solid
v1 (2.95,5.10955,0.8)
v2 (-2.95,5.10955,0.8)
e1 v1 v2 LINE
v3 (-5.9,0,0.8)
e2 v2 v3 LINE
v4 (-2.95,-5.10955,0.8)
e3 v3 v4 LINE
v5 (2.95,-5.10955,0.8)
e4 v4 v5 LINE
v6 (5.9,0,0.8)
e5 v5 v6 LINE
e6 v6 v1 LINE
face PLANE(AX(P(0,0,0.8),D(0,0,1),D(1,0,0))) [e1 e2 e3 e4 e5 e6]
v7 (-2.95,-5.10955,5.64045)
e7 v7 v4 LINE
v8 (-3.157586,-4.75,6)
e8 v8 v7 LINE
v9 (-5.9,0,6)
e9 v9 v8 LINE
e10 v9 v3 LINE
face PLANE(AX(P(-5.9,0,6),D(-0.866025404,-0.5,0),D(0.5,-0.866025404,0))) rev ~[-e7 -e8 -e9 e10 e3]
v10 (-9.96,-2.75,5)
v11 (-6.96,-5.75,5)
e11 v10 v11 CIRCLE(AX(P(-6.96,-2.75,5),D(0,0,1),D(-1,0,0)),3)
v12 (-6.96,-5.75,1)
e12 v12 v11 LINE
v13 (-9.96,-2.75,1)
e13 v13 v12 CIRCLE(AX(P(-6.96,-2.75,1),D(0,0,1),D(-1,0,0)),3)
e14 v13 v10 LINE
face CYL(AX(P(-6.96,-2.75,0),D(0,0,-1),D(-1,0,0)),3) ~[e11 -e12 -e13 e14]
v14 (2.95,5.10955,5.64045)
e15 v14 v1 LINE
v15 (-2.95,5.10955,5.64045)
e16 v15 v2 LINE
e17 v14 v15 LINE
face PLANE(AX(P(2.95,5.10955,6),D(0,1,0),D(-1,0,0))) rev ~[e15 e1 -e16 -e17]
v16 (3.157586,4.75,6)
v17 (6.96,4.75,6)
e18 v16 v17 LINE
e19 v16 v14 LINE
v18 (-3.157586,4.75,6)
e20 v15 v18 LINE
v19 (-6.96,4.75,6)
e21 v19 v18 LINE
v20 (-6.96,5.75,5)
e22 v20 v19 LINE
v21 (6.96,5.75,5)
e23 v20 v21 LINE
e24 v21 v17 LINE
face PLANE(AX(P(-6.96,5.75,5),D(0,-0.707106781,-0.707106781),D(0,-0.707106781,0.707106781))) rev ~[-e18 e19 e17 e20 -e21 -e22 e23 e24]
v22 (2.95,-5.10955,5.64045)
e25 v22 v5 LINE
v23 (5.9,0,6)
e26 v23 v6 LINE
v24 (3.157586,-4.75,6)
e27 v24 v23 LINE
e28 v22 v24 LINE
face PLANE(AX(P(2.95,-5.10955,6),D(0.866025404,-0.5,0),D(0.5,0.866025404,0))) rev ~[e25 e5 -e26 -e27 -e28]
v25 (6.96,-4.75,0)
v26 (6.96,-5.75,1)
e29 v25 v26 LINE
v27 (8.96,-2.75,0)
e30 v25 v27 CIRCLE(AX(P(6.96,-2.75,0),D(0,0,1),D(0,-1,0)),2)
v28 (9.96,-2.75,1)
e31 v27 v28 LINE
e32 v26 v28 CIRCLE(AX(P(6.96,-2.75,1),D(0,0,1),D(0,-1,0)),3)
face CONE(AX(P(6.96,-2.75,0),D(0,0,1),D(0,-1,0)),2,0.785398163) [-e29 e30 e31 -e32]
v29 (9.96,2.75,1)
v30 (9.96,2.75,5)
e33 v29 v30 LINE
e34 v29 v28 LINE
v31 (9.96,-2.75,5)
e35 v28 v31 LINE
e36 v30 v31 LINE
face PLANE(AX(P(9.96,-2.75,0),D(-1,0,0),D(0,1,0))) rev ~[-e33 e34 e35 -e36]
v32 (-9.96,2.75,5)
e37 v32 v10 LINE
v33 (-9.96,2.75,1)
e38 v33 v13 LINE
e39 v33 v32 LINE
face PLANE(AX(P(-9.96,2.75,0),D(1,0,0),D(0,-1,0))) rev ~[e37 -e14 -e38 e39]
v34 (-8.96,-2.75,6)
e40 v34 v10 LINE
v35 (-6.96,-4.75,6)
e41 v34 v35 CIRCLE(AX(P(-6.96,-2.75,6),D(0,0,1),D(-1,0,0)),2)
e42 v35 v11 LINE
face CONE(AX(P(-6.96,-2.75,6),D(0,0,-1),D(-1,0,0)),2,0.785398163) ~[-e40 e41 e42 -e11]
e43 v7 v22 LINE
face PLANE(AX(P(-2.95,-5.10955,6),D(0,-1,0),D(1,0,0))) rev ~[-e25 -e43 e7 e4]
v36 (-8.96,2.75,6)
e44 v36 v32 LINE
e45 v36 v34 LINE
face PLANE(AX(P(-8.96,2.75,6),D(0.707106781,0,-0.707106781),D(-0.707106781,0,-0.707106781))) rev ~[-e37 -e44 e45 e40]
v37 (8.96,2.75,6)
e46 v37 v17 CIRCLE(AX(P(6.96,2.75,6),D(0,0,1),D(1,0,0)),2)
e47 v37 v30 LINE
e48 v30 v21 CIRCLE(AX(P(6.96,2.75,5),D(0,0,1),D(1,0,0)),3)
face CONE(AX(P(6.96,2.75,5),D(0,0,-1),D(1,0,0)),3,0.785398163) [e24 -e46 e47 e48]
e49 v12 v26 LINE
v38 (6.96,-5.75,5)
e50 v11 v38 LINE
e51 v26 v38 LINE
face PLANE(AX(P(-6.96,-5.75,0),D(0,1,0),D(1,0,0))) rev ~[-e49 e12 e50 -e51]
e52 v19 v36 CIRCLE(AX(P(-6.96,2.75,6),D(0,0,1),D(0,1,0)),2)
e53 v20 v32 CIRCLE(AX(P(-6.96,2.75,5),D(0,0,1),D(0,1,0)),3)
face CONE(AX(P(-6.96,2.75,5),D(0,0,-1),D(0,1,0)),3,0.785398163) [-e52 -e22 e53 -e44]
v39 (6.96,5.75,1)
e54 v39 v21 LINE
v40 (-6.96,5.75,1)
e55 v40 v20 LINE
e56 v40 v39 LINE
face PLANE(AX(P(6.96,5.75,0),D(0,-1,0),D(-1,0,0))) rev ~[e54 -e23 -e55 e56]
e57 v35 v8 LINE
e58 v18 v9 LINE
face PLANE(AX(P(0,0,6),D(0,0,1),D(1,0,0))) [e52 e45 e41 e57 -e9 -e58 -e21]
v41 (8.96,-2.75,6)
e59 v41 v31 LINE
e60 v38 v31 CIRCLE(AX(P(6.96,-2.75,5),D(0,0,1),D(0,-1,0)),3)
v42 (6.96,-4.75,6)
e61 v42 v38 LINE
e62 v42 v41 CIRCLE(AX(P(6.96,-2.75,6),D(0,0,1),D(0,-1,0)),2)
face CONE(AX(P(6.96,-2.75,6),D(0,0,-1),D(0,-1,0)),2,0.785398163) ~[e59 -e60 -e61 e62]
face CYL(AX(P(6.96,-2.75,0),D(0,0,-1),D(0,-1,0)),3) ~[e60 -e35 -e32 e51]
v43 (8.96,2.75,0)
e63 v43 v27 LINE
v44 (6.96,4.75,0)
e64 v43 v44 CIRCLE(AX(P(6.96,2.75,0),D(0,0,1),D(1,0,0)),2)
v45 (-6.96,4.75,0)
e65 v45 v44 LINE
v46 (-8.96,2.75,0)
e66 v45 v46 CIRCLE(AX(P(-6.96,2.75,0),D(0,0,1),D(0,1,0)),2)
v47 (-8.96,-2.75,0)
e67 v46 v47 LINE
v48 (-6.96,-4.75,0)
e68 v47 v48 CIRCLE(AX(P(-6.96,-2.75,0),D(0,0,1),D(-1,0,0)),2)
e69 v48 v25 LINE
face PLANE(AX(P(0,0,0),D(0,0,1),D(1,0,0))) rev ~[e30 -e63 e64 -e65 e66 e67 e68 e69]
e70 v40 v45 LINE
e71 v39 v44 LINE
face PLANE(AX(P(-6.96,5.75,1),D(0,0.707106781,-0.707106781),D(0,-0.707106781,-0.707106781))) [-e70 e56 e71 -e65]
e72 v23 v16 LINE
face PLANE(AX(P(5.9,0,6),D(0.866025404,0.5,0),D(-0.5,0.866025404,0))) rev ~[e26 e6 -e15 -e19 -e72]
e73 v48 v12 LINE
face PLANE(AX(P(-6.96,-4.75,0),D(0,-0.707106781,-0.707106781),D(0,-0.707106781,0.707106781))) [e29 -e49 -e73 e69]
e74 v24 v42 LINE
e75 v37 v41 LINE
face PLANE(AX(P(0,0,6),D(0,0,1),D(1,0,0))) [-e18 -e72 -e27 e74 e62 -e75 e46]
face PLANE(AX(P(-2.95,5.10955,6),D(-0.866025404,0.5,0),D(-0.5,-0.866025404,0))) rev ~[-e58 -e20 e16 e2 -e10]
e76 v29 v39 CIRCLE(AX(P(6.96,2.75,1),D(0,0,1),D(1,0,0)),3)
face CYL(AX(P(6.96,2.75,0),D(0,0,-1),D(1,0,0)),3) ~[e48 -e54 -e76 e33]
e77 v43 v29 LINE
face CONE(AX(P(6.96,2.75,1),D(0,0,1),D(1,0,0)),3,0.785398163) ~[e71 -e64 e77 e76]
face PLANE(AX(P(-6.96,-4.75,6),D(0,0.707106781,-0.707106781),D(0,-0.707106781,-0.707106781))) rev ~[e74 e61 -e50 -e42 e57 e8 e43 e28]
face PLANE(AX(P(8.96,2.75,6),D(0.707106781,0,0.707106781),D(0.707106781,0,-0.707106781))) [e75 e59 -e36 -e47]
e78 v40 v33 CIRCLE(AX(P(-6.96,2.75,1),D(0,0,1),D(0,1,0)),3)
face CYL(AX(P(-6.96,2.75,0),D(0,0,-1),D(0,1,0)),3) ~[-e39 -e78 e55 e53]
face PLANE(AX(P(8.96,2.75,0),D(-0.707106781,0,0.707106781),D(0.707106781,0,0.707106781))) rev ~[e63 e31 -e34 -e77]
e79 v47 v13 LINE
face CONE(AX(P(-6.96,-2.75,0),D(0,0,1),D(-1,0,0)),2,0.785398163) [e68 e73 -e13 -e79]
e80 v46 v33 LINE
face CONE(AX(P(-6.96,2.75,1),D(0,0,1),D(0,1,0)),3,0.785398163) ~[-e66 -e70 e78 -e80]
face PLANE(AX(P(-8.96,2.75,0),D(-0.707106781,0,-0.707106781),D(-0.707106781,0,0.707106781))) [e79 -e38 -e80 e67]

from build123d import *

# Parameters (mm, degrees)
F1_DEPTH     = 6
F3_DEPTH     = 5.2
F4_T1_DEPTH  = 13.92
F4_T3_DEPTH  = 5.5
F4_T6_ANGLE  = 90
F4_T8_ANGLE  = 90
F4_T10_ANGLE = 90
F4_T12_ANGLE = 90
F4_T14_ANGLE = 90
F4_T16_ANGLE = 90
F4_T18_ANGLE = 90
F4_T20_ANGLE = 90


# Not quite as in the source:
# - a fillet or chamfer that OpenCascade refuses, or shapes differently, is made with other operations: its cross-section is extruded or revolved along the edge and cut away or added


with BuildPart() as f1:
    # F0 (on Top) → F1 (new body)
    with BuildSketch(Plane.XY):
        with BuildLine():
            Line((6.96, 5.75), (-6.96, 5.75))
            ThreePointArc((-6.96, 5.75), (-9.0813203436, 4.8713203436), (-9.96, 2.75))
            Line((-9.96, 2.75), (-9.96, -2.75))
            ThreePointArc((-9.96, -2.75), (-9.0813203436, -4.8713203436), (-6.96, -5.75))
            Line((-6.96, -5.75), (6.96, -5.75))
            ThreePointArc((6.96, -5.75), (9.0813203436, -4.8713203436), (9.96, -2.75))
            Line((9.96, -2.75), (9.96, 2.75))
            ThreePointArc((9.96, 2.75), (9.0813203436, 4.8713203436), (6.96, 5.75))
        make_face()
    extrude(amount=F1_DEPTH)

    # F2 (on face) → F3 (cut)
    with BuildSketch(Plane.XY.offset(6)):
        Polygon((2.95, 5.1095498823), (-2.95, 5.1095498823), (-5.9, 0), (-2.95, -5.1095498823), (2.95, -5.1095498823), (5.9, 0), align=None)
    extrude(amount=-F3_DEPTH, mode=Mode.SUBTRACT)

    # F4: chamfer of 1 on 2 edges, made by hand

    # F4_s2 → F4_t1 (cut)
    with BuildSketch(Plane.YZ.offset(-6.96)):
        Polygon((5.75, 5), (4.75, 6), (5.75, 6), align=None)
        Polygon((5.75, 1), (4.75, 0), (5.75, 0), align=None)
        Polygon((-4.75, 0), (-5.75, 1), (-5.75, 0), align=None)
        Polygon((-4.75, 6), (-5.75, 5), (-5.75, 6), align=None)
    extrude(amount=F4_T1_DEPTH, mode=Mode.SUBTRACT)

    # F4_s4 → F4_t3 (cut)
    with BuildSketch(Plane.XZ.offset(-2.75)):
        Polygon((-8.96, 0), (-9.96, 1), (-9.96, 0), align=None)
        Polygon((8.96, 0), (9.96, 1), (9.96, 0), align=None)
        Polygon((-8.96, 6), (-9.96, 5), (-9.96, 6), align=None)
        Polygon((8.96, 6), (9.96, 5), (9.96, 6), align=None)
    extrude(amount=F4_T3_DEPTH, mode=Mode.SUBTRACT)

    # F4_s5 → F4_t6 (revolve, cut)
    with BuildSketch(Plane.XZ.offset(-2.75)):
        Polygon((9.96, 1), (8.96, 0), (9.96, 0), align=None)
    revolve(axis=Axis((6.96, 2.75, 0), (0, 0, 1)), revolution_arc=F4_T6_ANGLE, mode=Mode.SUBTRACT)

    # F4_s7 → F4_t8 (revolve, cut)
    with BuildSketch(Plane.YZ.offset(-6.96)):
        Polygon((5.75, 1), (4.75, 0), (5.75, 0), align=None)
    revolve(axis=Axis((-6.96, 2.75, 0), (0, 0, 1)), revolution_arc=F4_T8_ANGLE, mode=Mode.SUBTRACT)

    # F4_s9 → F4_t10 (revolve, cut)
    with BuildSketch(Plane.XZ.offset(2.75)):
        Polygon((-8.96, 0), (-9.96, 1), (-9.96, 0), align=None)
    revolve(axis=Axis((-6.96, -2.75, 0), (0, 0, 1)), revolution_arc=F4_T10_ANGLE, mode=Mode.SUBTRACT)

    # F4_s11 → F4_t12 (revolve, cut)
    with BuildSketch(Plane.YZ.offset(6.96)):
        Polygon((-4.75, 0), (-5.75, 1), (-5.75, 0), align=None)
    revolve(axis=Axis((6.96, -2.75, 0), (0, 0, 1)), revolution_arc=F4_T12_ANGLE, mode=Mode.SUBTRACT)

    # F4_s13 → F4_t14 (revolve, cut)
    with BuildSketch(Plane.XZ.offset(-2.75)):
        Polygon((9.96, 5), (8.96, 6), (9.96, 6), align=None)
    revolve(axis=Axis((6.96, 2.75, 6), (0, 0, 1)), revolution_arc=F4_T14_ANGLE, mode=Mode.SUBTRACT)

    # F4_s15 → F4_t16 (revolve, cut)
    with BuildSketch(Plane.YZ.offset(-6.96)):
        Polygon((5.75, 5), (4.75, 6), (5.75, 6), align=None)
    revolve(axis=Axis((-6.96, 2.75, 6), (0, 0, 1)), revolution_arc=F4_T16_ANGLE, mode=Mode.SUBTRACT)

    # F4_s17 → F4_t18 (revolve, cut)
    with BuildSketch(Plane.XZ.offset(2.75)):
        Polygon((-8.96, 6), (-9.96, 5), (-9.96, 6), align=None)
    revolve(axis=Axis((-6.96, -2.75, 6), (0, 0, 1)), revolution_arc=F4_T18_ANGLE, mode=Mode.SUBTRACT)

    # F4_s19 → F4_t20 (revolve, cut)
    with BuildSketch(Plane.YZ.offset(6.96)):
        Polygon((-4.75, 6), (-5.75, 5), (-5.75, 6), align=None)
    revolve(axis=Axis((6.96, -2.75, 6), (0, 0, 1)), revolution_arc=F4_T20_ANGLE, mode=Mode.SUBTRACT)


solid = f1.part
